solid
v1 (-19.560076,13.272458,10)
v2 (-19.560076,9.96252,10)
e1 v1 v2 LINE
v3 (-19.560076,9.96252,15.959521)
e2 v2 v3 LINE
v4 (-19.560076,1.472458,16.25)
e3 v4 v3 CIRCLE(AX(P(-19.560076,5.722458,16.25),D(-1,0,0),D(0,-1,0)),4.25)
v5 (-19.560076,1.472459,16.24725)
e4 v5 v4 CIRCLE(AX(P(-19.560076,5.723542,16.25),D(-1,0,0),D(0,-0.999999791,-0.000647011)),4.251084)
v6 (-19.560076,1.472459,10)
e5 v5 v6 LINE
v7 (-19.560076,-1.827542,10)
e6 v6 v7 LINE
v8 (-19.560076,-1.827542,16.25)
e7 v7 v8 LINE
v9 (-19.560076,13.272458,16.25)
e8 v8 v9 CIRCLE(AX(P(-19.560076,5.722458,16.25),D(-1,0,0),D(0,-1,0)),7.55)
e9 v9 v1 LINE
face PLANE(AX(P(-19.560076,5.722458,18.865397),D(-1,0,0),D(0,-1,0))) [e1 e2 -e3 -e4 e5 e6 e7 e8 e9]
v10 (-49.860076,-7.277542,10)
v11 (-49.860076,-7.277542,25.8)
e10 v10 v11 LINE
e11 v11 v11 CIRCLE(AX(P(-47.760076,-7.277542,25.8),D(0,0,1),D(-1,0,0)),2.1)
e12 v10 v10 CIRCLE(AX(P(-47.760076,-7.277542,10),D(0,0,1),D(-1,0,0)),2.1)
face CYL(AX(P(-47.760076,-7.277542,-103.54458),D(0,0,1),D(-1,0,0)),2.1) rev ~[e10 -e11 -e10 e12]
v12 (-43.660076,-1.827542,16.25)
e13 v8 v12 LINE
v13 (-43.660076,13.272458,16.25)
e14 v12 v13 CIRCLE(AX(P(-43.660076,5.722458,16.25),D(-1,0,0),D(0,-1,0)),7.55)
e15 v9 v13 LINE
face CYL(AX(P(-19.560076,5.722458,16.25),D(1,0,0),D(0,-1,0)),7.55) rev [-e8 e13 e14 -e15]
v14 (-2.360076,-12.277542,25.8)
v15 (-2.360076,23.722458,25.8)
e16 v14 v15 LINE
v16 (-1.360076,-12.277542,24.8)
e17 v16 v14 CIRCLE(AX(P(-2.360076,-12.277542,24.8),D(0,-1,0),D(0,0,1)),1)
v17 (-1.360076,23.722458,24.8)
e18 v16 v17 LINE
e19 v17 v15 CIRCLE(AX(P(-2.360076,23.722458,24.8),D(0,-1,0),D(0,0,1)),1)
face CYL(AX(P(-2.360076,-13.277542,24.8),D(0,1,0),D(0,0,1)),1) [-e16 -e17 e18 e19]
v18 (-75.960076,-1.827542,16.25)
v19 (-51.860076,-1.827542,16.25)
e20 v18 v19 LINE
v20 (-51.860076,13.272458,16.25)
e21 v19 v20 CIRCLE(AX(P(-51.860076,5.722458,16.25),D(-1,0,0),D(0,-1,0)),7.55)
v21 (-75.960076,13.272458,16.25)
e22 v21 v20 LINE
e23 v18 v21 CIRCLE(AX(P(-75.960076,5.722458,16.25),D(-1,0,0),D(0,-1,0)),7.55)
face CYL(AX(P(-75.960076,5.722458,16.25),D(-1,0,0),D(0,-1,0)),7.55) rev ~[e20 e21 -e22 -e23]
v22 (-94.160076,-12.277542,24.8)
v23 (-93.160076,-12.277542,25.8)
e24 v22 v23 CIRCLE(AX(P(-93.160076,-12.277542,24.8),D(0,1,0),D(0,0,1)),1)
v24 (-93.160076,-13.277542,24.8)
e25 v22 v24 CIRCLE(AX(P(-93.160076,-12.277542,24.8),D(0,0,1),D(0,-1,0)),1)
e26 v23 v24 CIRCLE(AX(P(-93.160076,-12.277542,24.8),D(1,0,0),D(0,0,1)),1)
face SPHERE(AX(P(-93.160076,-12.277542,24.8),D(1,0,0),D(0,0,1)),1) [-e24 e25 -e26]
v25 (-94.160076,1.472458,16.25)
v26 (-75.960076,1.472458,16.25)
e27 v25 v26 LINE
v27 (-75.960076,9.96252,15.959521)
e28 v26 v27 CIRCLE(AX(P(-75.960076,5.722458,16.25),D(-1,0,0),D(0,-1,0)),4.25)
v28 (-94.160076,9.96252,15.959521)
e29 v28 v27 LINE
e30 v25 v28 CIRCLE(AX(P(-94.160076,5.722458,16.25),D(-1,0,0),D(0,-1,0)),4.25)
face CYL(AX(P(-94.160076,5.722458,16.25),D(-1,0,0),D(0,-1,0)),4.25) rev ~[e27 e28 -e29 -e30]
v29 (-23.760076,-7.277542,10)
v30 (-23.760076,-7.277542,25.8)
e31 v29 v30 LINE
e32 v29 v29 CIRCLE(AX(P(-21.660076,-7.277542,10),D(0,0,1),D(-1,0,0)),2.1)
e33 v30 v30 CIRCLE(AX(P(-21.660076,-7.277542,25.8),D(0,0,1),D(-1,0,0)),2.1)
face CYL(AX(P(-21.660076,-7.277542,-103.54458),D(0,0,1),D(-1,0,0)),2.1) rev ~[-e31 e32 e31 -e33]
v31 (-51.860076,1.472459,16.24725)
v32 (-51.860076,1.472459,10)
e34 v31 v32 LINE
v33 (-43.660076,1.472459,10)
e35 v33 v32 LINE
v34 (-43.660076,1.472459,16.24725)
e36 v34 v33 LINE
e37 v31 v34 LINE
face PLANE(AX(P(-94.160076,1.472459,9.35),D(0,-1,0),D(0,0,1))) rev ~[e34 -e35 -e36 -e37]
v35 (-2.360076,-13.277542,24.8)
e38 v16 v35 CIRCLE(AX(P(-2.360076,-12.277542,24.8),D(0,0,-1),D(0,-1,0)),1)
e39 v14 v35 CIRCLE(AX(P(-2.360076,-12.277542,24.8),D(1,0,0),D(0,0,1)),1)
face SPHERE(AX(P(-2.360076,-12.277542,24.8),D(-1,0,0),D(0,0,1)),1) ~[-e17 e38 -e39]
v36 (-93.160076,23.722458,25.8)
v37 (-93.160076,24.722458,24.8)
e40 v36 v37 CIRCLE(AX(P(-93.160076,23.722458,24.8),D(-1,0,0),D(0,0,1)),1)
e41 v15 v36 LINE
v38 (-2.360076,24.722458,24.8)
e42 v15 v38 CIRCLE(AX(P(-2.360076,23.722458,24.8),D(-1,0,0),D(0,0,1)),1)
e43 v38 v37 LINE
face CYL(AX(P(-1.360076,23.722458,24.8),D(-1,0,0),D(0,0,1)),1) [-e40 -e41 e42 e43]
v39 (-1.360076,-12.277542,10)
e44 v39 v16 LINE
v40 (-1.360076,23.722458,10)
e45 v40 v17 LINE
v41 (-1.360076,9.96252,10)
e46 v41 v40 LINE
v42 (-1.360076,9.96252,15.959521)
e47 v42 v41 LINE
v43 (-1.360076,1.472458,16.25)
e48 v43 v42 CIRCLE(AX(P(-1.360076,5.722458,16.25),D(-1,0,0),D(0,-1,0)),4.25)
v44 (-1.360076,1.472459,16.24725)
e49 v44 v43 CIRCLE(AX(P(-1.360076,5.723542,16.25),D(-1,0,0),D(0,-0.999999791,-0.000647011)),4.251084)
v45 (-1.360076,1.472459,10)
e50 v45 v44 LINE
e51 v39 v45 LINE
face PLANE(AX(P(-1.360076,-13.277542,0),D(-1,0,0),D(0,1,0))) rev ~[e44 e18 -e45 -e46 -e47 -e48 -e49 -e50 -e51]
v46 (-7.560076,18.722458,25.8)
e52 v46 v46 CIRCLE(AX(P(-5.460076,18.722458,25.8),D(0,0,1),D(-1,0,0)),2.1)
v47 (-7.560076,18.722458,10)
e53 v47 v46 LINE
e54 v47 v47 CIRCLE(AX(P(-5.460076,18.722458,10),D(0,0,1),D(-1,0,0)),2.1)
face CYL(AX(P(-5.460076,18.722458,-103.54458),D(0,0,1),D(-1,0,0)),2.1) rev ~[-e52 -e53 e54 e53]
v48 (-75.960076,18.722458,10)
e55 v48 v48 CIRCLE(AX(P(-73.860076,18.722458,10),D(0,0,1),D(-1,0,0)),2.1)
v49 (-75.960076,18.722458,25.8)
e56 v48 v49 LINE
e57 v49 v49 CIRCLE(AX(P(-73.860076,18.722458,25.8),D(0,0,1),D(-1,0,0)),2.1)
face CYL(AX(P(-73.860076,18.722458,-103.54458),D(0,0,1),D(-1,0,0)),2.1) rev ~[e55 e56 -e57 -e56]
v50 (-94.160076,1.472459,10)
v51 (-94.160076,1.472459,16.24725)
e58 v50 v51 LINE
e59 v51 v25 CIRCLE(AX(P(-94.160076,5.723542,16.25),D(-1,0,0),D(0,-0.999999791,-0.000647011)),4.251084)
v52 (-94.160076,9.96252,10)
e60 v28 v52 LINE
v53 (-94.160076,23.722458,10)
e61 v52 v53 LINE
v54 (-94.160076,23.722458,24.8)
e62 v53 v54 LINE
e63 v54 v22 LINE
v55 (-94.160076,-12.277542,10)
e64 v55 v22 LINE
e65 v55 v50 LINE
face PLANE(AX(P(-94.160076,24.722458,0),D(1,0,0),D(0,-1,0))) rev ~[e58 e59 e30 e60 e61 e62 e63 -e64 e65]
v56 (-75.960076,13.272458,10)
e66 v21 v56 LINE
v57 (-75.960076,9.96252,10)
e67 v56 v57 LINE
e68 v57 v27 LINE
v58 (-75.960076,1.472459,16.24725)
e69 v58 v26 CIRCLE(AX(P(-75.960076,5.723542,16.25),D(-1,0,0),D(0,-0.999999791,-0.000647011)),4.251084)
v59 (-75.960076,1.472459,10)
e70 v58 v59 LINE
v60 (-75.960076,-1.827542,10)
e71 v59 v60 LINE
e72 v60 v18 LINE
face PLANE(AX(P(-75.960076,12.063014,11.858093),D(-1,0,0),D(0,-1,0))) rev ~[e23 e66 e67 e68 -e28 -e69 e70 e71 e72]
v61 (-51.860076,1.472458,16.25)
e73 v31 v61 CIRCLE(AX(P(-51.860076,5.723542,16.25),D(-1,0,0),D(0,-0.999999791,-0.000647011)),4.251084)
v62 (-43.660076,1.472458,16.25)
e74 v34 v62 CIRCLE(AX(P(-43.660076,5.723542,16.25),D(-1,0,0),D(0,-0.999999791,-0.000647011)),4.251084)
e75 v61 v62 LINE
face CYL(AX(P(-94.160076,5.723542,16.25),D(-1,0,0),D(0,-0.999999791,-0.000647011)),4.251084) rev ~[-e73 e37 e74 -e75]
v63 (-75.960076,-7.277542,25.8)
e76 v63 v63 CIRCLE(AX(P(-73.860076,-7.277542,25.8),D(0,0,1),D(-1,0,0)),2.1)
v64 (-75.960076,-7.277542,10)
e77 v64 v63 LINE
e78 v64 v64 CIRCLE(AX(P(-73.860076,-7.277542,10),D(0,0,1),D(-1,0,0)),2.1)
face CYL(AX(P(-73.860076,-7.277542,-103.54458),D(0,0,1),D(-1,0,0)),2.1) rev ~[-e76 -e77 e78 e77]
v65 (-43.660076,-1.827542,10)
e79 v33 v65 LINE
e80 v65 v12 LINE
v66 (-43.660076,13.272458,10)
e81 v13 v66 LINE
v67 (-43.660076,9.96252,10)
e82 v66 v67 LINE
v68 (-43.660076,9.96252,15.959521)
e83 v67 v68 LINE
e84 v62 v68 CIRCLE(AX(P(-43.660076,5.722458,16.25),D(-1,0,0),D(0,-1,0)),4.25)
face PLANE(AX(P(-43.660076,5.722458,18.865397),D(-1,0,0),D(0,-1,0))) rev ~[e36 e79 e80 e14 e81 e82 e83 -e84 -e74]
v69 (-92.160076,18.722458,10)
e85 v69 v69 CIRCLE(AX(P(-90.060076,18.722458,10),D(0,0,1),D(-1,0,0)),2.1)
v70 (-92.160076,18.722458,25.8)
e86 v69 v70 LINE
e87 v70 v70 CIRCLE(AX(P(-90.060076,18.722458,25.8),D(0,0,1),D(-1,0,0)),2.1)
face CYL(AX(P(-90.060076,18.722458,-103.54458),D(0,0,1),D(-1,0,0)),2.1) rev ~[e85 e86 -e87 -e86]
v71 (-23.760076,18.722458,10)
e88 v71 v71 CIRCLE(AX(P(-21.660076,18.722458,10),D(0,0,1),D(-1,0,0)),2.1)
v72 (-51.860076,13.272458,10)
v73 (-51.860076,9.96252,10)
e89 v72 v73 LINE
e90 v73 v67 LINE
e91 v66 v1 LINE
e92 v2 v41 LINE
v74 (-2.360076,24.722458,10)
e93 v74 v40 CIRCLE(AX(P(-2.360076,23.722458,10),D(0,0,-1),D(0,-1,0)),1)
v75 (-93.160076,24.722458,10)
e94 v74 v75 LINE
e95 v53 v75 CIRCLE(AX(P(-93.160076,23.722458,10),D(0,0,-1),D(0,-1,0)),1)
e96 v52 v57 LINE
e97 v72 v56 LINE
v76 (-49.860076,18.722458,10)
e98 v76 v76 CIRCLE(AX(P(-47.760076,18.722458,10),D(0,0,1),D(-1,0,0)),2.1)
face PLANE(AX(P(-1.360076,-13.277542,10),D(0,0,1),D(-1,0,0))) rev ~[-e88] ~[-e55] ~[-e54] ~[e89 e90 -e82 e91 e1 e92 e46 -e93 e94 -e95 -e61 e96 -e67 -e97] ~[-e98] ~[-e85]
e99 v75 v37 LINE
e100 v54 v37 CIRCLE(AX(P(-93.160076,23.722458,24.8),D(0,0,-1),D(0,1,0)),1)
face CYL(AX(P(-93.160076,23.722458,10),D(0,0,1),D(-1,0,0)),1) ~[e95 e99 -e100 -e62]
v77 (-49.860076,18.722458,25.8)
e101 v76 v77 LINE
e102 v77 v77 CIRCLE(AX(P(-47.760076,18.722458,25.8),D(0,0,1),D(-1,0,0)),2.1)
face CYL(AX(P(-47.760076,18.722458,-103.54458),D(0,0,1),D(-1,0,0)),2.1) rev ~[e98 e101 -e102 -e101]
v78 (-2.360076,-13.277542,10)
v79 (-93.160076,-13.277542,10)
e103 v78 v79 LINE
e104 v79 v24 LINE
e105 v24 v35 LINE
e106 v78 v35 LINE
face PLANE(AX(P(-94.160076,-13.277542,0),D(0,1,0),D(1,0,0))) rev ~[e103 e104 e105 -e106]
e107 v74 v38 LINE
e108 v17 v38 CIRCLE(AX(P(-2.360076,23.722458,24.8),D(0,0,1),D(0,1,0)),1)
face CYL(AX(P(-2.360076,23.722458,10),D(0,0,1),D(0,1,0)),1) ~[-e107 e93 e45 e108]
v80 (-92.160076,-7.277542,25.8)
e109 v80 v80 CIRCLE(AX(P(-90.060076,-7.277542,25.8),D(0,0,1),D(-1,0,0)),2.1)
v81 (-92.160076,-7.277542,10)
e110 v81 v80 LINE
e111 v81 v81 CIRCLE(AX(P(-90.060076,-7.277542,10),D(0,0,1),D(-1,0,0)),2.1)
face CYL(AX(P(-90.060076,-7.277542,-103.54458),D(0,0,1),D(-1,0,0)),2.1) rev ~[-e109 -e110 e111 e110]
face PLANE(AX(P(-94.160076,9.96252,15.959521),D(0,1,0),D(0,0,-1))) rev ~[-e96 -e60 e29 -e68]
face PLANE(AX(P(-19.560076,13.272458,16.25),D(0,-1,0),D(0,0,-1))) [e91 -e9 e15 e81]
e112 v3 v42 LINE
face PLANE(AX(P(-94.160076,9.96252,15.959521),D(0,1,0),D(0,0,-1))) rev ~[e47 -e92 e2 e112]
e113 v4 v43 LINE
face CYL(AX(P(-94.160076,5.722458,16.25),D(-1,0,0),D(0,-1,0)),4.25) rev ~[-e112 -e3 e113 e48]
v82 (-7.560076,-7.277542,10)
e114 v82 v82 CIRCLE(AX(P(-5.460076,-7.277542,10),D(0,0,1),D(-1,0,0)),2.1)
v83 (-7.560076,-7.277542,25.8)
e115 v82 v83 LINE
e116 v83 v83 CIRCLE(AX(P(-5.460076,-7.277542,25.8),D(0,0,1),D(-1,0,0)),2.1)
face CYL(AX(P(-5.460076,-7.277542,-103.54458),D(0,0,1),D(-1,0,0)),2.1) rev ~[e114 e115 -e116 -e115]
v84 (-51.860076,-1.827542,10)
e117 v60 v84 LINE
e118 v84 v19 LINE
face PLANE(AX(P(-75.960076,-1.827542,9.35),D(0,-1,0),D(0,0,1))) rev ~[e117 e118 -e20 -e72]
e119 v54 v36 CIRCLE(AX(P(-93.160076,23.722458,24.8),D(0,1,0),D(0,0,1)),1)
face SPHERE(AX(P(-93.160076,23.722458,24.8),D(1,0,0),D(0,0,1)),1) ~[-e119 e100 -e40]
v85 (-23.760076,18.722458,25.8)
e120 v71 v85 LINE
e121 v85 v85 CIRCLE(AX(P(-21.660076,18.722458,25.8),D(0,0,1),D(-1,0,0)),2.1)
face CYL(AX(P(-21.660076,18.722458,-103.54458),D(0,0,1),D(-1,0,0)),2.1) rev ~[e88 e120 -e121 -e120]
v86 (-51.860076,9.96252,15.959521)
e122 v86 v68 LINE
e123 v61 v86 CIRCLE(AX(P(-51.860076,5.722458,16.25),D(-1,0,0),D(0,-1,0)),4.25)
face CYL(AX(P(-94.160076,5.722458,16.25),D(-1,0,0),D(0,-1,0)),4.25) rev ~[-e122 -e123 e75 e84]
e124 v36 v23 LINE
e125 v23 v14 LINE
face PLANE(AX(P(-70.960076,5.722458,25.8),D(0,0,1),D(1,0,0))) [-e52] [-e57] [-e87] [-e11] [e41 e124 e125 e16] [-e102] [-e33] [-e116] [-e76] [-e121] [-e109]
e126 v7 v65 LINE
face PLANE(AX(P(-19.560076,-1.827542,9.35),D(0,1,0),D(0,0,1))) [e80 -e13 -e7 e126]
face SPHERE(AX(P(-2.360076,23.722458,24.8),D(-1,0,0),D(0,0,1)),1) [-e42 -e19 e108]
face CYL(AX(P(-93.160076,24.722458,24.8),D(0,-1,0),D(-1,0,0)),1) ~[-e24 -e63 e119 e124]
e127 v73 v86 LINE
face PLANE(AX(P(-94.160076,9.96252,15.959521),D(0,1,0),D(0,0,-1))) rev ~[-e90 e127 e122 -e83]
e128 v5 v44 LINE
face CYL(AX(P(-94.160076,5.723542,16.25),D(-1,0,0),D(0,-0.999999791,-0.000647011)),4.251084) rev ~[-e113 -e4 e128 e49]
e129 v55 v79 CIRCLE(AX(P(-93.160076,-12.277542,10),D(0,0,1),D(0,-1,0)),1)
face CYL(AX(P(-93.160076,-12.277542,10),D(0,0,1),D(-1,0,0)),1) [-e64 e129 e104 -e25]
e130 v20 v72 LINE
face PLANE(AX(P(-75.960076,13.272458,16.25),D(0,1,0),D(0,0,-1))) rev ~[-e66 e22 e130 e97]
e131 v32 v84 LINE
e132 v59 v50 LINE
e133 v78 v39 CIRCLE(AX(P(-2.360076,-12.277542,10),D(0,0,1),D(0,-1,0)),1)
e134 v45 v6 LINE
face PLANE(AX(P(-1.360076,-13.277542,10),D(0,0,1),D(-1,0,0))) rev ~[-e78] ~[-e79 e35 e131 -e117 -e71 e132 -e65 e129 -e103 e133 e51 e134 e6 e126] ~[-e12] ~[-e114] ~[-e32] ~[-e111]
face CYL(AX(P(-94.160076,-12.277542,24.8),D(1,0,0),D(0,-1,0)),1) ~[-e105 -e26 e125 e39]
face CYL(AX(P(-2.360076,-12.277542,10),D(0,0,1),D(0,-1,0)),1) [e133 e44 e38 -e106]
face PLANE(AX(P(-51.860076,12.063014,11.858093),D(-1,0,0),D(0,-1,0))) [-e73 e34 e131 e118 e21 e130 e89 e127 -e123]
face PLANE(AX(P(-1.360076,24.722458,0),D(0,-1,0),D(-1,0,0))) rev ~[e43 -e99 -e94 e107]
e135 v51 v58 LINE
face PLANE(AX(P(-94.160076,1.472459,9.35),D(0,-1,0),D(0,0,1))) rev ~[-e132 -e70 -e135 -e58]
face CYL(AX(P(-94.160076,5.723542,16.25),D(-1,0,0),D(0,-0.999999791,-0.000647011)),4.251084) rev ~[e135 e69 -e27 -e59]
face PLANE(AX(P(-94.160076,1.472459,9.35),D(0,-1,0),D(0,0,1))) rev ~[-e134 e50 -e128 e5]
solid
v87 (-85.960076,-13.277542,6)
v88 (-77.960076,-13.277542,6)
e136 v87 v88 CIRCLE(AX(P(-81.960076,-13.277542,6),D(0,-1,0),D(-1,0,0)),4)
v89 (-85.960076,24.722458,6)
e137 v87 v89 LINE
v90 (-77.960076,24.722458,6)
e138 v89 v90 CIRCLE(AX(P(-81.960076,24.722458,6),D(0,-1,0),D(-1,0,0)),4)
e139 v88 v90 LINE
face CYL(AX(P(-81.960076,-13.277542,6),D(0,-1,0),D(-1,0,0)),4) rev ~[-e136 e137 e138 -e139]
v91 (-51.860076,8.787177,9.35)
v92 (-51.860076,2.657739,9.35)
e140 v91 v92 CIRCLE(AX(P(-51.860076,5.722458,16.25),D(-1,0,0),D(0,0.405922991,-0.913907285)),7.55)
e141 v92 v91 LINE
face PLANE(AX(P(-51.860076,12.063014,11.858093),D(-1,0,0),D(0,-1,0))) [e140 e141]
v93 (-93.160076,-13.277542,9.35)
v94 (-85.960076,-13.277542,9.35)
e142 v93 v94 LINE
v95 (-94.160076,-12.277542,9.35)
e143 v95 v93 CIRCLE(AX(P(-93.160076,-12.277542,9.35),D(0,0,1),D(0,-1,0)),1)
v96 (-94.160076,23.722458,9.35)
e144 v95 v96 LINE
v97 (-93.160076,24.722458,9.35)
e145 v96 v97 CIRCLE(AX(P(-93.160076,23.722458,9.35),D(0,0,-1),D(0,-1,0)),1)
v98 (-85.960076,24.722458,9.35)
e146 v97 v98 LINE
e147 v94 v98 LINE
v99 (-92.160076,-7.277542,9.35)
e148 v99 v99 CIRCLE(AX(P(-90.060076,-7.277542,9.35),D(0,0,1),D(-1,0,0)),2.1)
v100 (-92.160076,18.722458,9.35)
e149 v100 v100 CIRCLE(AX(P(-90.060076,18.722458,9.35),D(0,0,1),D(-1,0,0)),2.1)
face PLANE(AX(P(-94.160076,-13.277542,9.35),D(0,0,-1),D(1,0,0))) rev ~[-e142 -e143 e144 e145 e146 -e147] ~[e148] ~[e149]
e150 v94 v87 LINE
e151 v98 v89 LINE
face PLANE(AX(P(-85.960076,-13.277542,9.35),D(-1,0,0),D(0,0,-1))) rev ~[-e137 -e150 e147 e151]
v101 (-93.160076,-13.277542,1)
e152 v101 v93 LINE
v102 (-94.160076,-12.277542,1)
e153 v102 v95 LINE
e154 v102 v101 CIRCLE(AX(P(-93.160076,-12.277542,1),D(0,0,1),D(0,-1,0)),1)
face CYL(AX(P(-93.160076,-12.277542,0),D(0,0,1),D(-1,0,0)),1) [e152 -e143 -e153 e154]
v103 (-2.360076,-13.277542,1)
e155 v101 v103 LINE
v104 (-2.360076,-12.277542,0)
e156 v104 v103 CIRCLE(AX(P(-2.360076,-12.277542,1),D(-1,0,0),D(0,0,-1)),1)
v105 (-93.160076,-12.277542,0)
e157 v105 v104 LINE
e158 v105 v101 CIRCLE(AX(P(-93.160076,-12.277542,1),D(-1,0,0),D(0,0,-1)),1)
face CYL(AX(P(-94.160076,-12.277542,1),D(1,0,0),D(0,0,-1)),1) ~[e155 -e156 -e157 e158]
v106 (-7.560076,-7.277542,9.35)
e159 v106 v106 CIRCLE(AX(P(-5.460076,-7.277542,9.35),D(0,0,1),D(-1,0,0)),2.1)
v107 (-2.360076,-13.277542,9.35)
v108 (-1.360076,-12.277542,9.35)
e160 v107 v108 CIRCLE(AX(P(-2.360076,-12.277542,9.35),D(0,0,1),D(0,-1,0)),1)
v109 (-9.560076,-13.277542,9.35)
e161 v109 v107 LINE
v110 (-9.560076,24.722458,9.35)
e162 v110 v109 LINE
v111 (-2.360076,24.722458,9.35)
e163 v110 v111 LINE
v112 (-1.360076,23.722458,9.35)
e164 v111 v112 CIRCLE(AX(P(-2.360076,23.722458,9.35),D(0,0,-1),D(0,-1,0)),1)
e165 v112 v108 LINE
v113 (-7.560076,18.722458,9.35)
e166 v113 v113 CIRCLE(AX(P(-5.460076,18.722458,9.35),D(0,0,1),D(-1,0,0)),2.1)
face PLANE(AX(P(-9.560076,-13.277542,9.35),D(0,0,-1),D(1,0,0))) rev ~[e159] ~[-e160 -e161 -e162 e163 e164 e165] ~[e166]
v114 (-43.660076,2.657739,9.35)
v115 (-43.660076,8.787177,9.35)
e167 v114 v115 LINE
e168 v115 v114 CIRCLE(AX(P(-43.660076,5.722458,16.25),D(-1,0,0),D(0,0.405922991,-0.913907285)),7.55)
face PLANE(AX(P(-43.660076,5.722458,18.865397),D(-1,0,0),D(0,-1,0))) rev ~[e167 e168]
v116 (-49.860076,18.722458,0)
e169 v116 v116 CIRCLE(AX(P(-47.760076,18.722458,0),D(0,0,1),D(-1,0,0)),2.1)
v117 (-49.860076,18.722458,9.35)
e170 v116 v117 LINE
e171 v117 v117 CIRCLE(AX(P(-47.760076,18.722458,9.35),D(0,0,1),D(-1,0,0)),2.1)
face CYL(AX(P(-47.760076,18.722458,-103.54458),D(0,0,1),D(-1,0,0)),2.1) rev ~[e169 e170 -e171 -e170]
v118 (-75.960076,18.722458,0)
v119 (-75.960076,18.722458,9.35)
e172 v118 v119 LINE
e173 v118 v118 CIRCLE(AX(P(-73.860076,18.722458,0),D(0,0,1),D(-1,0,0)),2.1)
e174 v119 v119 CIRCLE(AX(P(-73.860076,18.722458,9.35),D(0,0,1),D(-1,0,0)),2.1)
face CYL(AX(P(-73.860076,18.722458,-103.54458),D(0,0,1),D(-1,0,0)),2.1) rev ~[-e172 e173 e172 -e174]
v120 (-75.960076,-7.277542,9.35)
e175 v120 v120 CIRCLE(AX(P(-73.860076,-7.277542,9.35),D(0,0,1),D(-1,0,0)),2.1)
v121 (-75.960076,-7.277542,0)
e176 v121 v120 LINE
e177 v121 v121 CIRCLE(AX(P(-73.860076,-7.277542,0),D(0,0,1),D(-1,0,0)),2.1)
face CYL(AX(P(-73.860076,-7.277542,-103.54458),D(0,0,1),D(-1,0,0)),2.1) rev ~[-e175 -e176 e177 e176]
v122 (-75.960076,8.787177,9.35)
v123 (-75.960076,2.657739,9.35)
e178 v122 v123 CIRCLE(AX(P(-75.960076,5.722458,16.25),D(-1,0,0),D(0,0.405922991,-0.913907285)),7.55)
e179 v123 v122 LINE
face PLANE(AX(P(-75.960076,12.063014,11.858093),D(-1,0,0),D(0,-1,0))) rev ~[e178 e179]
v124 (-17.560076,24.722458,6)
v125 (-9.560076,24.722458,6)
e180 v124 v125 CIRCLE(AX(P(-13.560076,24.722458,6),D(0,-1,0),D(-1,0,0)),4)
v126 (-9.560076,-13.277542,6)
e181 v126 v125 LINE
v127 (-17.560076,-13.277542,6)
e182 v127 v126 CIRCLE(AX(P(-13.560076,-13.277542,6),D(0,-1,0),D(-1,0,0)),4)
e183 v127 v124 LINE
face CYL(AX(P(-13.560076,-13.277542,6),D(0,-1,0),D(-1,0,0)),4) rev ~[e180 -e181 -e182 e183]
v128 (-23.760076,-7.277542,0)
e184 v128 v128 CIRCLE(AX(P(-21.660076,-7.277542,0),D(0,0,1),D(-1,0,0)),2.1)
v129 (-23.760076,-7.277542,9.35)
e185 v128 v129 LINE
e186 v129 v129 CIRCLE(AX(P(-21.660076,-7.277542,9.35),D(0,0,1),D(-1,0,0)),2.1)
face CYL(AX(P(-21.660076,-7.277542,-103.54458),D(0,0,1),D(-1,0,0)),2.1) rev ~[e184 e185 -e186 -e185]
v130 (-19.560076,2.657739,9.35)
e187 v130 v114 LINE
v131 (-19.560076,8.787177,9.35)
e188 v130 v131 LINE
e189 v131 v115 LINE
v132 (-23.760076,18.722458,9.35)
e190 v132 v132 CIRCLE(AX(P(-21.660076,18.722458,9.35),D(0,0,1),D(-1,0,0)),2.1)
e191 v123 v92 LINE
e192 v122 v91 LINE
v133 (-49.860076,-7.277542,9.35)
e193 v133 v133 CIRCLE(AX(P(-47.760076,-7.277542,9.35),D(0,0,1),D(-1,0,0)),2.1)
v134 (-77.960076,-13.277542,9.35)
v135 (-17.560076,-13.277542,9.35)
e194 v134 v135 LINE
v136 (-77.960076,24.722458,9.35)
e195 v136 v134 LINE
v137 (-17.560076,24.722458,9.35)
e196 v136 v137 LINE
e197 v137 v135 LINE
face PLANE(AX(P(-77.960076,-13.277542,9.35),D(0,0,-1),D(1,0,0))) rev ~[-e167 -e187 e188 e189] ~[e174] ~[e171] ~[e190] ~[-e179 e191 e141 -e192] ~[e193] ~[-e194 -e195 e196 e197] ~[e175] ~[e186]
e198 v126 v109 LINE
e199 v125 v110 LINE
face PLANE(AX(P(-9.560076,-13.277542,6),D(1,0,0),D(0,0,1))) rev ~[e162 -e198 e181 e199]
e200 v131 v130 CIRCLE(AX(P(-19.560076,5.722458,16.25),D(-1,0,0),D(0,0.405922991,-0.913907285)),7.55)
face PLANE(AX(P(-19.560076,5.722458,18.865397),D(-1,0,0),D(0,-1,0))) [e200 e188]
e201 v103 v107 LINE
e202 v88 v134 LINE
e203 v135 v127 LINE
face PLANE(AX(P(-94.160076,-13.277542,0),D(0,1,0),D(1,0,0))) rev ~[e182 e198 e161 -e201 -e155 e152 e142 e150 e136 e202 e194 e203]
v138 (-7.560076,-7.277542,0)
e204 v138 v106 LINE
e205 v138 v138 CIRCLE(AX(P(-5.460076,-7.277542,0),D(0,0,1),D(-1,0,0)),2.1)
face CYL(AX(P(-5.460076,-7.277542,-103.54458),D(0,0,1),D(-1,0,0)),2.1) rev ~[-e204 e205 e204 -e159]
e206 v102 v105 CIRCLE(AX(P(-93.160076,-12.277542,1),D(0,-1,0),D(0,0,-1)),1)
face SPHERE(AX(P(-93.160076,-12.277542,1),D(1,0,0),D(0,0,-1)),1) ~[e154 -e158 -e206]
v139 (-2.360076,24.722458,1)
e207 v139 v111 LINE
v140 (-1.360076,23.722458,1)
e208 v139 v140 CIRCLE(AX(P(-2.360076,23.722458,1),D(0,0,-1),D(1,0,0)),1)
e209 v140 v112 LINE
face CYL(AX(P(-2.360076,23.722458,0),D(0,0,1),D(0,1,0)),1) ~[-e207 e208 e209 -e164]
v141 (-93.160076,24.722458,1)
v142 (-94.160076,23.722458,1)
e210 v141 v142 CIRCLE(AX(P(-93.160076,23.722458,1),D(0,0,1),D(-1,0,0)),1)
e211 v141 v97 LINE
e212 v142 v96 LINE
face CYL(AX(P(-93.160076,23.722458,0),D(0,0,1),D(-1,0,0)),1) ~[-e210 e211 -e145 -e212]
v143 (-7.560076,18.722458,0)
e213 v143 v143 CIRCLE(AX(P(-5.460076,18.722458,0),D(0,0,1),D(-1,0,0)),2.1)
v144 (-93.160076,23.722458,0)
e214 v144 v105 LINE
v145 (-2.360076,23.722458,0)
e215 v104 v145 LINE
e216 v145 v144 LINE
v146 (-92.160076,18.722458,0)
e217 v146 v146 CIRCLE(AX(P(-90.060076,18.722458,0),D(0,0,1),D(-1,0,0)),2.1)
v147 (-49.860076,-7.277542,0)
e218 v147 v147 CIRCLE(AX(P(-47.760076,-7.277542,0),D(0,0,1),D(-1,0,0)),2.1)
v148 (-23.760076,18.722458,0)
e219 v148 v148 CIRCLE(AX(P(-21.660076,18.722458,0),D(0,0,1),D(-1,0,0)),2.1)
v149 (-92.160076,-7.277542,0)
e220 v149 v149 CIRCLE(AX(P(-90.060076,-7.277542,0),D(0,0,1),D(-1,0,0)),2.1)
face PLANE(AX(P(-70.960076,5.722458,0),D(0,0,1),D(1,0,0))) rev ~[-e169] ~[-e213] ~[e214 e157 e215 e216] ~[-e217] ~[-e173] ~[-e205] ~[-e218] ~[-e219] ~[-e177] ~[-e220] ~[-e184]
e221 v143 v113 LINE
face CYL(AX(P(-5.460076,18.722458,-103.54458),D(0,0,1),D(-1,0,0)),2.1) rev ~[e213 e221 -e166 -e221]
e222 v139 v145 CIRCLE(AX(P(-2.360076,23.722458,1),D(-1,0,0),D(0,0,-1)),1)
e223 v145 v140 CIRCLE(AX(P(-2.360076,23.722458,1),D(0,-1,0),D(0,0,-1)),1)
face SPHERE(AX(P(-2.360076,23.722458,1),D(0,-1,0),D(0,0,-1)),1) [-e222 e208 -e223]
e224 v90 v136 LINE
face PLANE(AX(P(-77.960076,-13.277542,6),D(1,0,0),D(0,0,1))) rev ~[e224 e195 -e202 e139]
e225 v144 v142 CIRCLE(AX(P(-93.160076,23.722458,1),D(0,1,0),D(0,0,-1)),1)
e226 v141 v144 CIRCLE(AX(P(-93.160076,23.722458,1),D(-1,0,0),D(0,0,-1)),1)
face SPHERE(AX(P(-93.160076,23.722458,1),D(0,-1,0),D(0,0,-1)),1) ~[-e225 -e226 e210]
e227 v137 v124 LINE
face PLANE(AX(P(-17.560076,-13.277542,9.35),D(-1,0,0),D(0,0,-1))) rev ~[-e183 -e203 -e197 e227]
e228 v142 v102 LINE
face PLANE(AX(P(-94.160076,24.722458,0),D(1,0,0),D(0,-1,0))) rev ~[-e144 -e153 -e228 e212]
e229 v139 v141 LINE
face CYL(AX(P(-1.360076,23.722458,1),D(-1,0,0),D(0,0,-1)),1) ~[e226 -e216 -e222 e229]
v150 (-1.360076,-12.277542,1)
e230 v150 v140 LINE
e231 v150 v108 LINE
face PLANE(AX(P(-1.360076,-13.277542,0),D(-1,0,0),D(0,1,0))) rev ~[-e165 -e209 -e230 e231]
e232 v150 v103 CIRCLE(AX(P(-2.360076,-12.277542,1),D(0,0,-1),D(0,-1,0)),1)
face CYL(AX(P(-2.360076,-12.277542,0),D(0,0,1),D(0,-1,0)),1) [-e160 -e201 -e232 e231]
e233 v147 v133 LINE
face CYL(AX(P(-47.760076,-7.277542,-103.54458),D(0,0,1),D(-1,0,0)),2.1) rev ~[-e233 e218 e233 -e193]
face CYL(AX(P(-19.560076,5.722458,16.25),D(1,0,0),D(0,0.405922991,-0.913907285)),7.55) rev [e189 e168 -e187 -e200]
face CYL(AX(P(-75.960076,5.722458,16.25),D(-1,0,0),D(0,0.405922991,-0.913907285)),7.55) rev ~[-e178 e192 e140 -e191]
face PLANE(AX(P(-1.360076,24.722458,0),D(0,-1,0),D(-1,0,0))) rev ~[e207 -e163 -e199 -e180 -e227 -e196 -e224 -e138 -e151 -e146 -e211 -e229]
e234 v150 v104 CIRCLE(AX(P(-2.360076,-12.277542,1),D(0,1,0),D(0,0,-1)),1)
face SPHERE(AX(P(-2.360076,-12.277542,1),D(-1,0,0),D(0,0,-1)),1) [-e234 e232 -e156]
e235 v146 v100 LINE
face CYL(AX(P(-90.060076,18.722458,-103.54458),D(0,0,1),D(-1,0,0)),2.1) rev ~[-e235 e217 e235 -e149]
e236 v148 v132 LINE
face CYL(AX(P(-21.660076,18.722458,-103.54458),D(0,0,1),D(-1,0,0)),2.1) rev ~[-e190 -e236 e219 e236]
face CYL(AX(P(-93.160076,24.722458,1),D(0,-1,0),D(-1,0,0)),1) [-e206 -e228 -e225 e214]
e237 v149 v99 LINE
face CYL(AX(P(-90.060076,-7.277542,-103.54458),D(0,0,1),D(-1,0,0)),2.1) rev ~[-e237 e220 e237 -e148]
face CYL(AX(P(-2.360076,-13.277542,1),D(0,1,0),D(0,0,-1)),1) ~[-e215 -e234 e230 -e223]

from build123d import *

# Parameters (mm, degrees)
F1_DEPTH  = 25.8
F4_DEPTH  = 92.801
F3_W      = 60.4
F3_H      = 0.65
F3_W_2    = 8.2
F5_DEPTH  = 38.001
F8_DEPTH  = 24.1
F11_DEPTH = 24.1
F12_R     = 1
F13_D     = 4.2


with BuildPart() as f1:
    # F0 (on Top) → F1 (new body)
    with BuildSketch(Plane.XY):
        Polygon((-94.1600755115, 24.7224580343), (-94.1600755115, -13.2775419657), (-85.9600755115, -13.2775419657), (-77.9600755115, -13.2775419657), (-47.7600755115, -13.2775419657), (-47.7600755115, 24.7224580343), align=None)
        Polygon((-1.3600755115, 24.7224580343), (-47.7600755115, 24.7224580343), (-47.7600755115, -13.2775419657), (-17.5600755115, -13.2775419657), (-9.5600755115, -13.2775419657), (-1.3600755115, -13.2775419657), align=None)
    extrude(amount=F1_DEPTH)

    # F2 (on face) → F4 (cut, through all)
    with BuildSketch(Plane(origin=(-94.1600755115, 0, 0), x_dir=(0, -1, 0), z_dir=(-1, 0, 0))):
        with BuildLine():
            ThreePointArc((-1.4724589241, 16.247249813), (-1.4724582568, 16.2486249064), (-1.4724580343, 16.25))
            ThreePointArc((-1.4724580343, 16.25), (-5.8677825168, 20.4975146609), (-9.9625195848, 15.9595210024))
            ThreePointArc((-9.9625195848, 15.9595210024), (-5.5785078489, 12.0024385415), (-1.4724589241, 16.247249813))
        make_face()
        with BuildLine():
            ThreePointArc((-1.4724589241, 16.247249813), (-5.5785078489, 12.0024385415), (-9.9625195848, 15.9595210024))
            Line((-9.9625195848, 15.9595210024), (-9.9625195848, 10.0030505006))
            ThreePointArc((-9.9625195848, 10.0030505006), (-9.3894148029, 9.6503084877), (-8.7871766185, 9.35))
            Line((-8.7871766185, 9.35), (-2.6577394502, 9.35))
            ThreePointArc((-2.6577394502, 9.35), (-2.0502502399, 9.6532288266), (-1.4724589241, 10.0098070892))
            Line((-1.4724589241, 10.0098070892), (-1.4724589241, 16.247249813))
        make_face()
        with BuildLine():
            ThreePointArc((-8.7871766185, 9.35), (-9.3894148029, 9.6503084877), (-9.9625195848, 10.0030505006))
            Line((-9.9625195848, 10.0030505006), (-9.9625195848, 9.35))
            Line((-9.9625195848, 9.35), (-8.7871766185, 9.35))
        make_face()
        with BuildLine():
            Line((-1.4724589241, 9.35), (-1.4724589241, 10.0098070892))
            ThreePointArc((-1.4724589241, 10.0098070892), (-2.0502502399, 9.6532288266), (-2.6577394502, 9.35))
            Line((-2.6577394502, 9.35), (-1.4724589241, 9.35))
        make_face()
    extrude(amount=-F4_DEPTH, mode=Mode.SUBTRACT)

    # F3 (on face) → F5 (cut, through all)
    with BuildSketch(Plane.XZ.offset(13.2775419657)):
        with BuildLine():
            ThreePointArc((-84.145824811, 9.35), (-85.4773896287, 7.9048625675), (-85.9600755115, 6))
            Line((-85.9600755115, 6), (-77.9600755115, 6))
            ThreePointArc((-77.9600755115, 6), (-78.4427613944, 7.9048625675), (-79.7743262121, 9.35))
            Line((-79.7743262121, 9.35), (-84.145824811, 9.35))
        make_face()
        with BuildLine():
            ThreePointArc((-81.9600755115, 10), (-83.1002509366, 9.8340579025), (-84.145824811, 9.35))
            Line((-84.145824811, 9.35), (-79.7743262121, 9.35))
            ThreePointArc((-79.7743262121, 9.35), (-80.8199000864, 9.8340579025), (-81.9600755115, 10))
        make_face()
        with BuildLine():
            Line((-11.3743262121, 9.35), (-15.745824811, 9.35))
            ThreePointArc((-15.745824811, 9.35), (-17.0773896287, 7.9048625675), (-17.5600755115, 6))
            Line((-17.5600755115, 6), (-9.5600755115, 6))
            ThreePointArc((-9.5600755115, 6), (-10.0427613944, 7.9048625675), (-11.3743262121, 9.35))
        make_face()
        with BuildLine():
            ThreePointArc((-13.560075504, 10), (-14.700250933, 9.8340579036), (-15.745824811, 9.35))
            Line((-15.745824811, 9.35), (-11.3743262121, 9.35))
            ThreePointArc((-11.3743262121, 9.35), (-12.4199000828, 9.8340579015), (-13.560075504, 10))
        make_face()
        with BuildLine():
            Line((-77.9600755115, 6), (-85.9600755115, 6))
            ThreePointArc((-85.9600755115, 6), (-81.9600755115, 2), (-77.9600755115, 6))
        make_face()
        with BuildLine():
            ThreePointArc((-79.7743262121, 9.35), (-78.4427613944, 7.9048625675), (-77.9600755115, 6))
            Line((-77.9600755115, 6), (-77.9600755115, 9.35))
            Line((-77.9600755115, 9.35), (-79.7743262121, 9.35))
        make_face()
        with BuildLine():
            ThreePointArc((-81.9600755115, 10), (-80.8199000864, 9.8340579025), (-79.7743262121, 9.35))
            Line((-79.7743262121, 9.35), (-77.9600755115, 9.35))
            Line((-77.9600755115, 9.35), (-77.9600755115, 10))
            Line((-77.9600755115, 10), (-81.9600755115, 10))
        make_face()
        with BuildLine():
            Line((-85.9600755115, 9.35), (-84.145824811, 9.35))
            ThreePointArc((-84.145824811, 9.35), (-83.1002509366, 9.8340579025), (-81.9600755115, 10))
            Line((-81.9600755115, 10), (-85.9600755115, 10))
            Line((-85.9600755115, 10), (-85.9600755115, 9.35))
        make_face()
        with BuildLine():
            Line((-85.9600755115, 9.35), (-85.9600755115, 6))
            ThreePointArc((-85.9600755115, 6), (-85.4773896287, 7.9048625675), (-84.145824811, 9.35))
            Line((-84.145824811, 9.35), (-85.9600755115, 9.35))
        make_face()
        with BuildLine():
            Line((-9.5600755115, 6), (-17.5600755115, 6))
            ThreePointArc((-17.5600755115, 6), (-13.5600755115, 2), (-9.5600755115, 6))
        make_face()
        with BuildLine():
            Line((-17.5600755115, 10), (-17.5600755115, 9.35))
            Line((-17.5600755115, 9.35), (-15.745824811, 9.35))
            ThreePointArc((-15.745824811, 9.35), (-14.700250933, 9.8340579036), (-13.560075504, 10))
            Line((-13.560075504, 10), (-17.5600755115, 10))
        make_face()
        with BuildLine():
            Line((-15.745824811, 9.35), (-17.5600755115, 9.35))
            Line((-17.5600755115, 9.35), (-17.5600755115, 6))
            ThreePointArc((-17.5600755115, 6), (-17.0773896287, 7.9048625675), (-15.745824811, 9.35))
        make_face()
        with BuildLine():
            Line((-9.5600755115, 9.35), (-11.3743262121, 9.35))
            ThreePointArc((-11.3743262121, 9.35), (-10.0427613944, 7.9048625675), (-9.5600755115, 6))
            Line((-9.5600755115, 6), (-9.5600755115, 9.35))
        make_face()
        with BuildLine():
            Line((-9.5600755115, 10), (-13.560075504, 10))
            ThreePointArc((-13.560075504, 10), (-12.4199000828, 9.8340579015), (-11.3743262121, 9.35))
            Line((-11.3743262121, 9.35), (-9.5600755115, 9.35))
            Line((-9.5600755115, 9.35), (-9.5600755115, 10))
        make_face()
        with Locations((-47.7600755115, 9.675)):
            Rectangle(F3_W, F3_H)
        with Locations((-90.0600755115, 9.675)):
            Rectangle(F3_W_2, F3_H)
        with Locations((-5.4600755115, 9.675)):
            Rectangle(F3_W_2, F3_H)
    extrude(amount=-F5_DEPTH, mode=Mode.SUBTRACT)

    # F7 (on line) → F8 (cut)
    with BuildSketch(Plane(origin=(-75.9600755115, 0, 0), x_dir=(0, -1, 0), z_dir=(-1, 0, 0))):
        with BuildLine():
            ThreePointArc((-8.7871766185, 9.35), (-12.0525893643, 12.1351564617), (-13.2724580343, 16.25))
            Line((-13.2724580343, 16.25), (-13.2724580343, 9.35))
            Line((-13.2724580343, 9.35), (-8.7871766185, 9.35))
        make_face()
        with BuildLine():
            Line((1.8275419657, 9.35), (1.8275419657, 16.25))
            ThreePointArc((1.8275419657, 16.25), (0.6076732957, 12.1351564617), (-2.6577394502, 9.35))
            Line((-2.6577394502, 9.35), (1.8275419657, 9.35))
        make_face()
        with BuildLine():
            ThreePointArc((-2.6577394502, 9.35), (0.6076732957, 12.1351564617), (1.8275419657, 16.25))
            Line((1.8275419657, 16.25), (-13.2724580343, 16.25))
            ThreePointArc((-13.2724580343, 16.25), (-12.0525893643, 12.1351564617), (-8.7871766185, 9.35))
            Line((-8.7871766185, 9.35), (-2.6577394502, 9.35))
        make_face()
        with BuildLine():
            Line((-13.2724580343, 16.25), (1.8275419657, 16.25))
            ThreePointArc((1.8275419657, 16.25), (-5.7224580343, 23.8), (-13.2724580343, 16.25))
        make_face()
        with BuildLine():
            ThreePointArc((-8.7871766185, 9.35), (-5.7224580343, 8.7), (-2.6577394502, 9.35))
            Line((-2.6577394502, 9.35), (-8.7871766185, 9.35))
        make_face()
    extrude(amount=-F8_DEPTH, mode=Mode.SUBTRACT)

    # F10 (on line) → F11 (cut)
    with BuildSketch(Plane(origin=(-19.5600755115, 0, 0), x_dir=(0, -1, 0), z_dir=(-1, 0, 0))):
        with BuildLine():
            Line((-13.2724580343, 16.25), (1.8275419657, 16.25))
            ThreePointArc((1.8275419657, 16.25), (-5.7224580343, 23.8), (-13.2724580343, 16.25))
        make_face()
        with BuildLine():
            ThreePointArc((-2.6577394502, 9.35), (0.6076732957, 12.1351564617), (1.8275419657, 16.25))
            Line((1.8275419657, 16.25), (-13.2724580343, 16.25))
            ThreePointArc((-13.2724580343, 16.25), (-12.0525893643, 12.1351564617), (-8.7871766185, 9.35))
            Line((-8.7871766185, 9.35), (-2.6577394502, 9.35))
        make_face()
        with BuildLine():
            ThreePointArc((-8.7871766185, 9.35), (-12.0525893643, 12.1351564617), (-13.2724580343, 16.25))
            Line((-13.2724580343, 16.25), (-13.2724580343, 9.35))
            Line((-13.2724580343, 9.35), (-8.7871766185, 9.35))
        make_face()
        with BuildLine():
            Line((1.8275419657, 9.35), (1.8275419657, 16.25))
            ThreePointArc((1.8275419657, 16.25), (0.6076732957, 12.1351564617), (-2.6577394502, 9.35))
            Line((-2.6577394502, 9.35), (1.8275419657, 9.35))
        make_face()
        with BuildLine():
            ThreePointArc((-8.7871766185, 9.35), (-5.7224580343, 8.7), (-2.6577394502, 9.35))
            Line((-2.6577394502, 9.35), (-8.7871766185, 9.35))
        make_face()
    extrude(amount=F11_DEPTH, mode=Mode.SUBTRACT)

    # F12
    f12_edges = [f1.edges().sort_by_distance(p)[0] for p in [
        (-47.760076, -13.277542, 0),
        (-1.360076, 5.722458, 0),
        (-94.160076, 5.722458, 0),
        (-47.760076, 24.722458, 25.8),
        (-47.760076, -13.277542, 25.8),
        (-1.360076, 5.722458, 25.8),
        (-1.360076, 24.722458, 17.9),
        (-1.360076, -13.277542, 17.9),
        (-94.160076, 5.722458, 25.8),
        (-94.160076, -13.277542, 17.9),
        (-94.160076, 24.722458, 17.9),
        (-47.760076, 24.722458, 0),
        (-94.160076, 24.722458, 4.675),
        (-94.160076, -13.277542, 4.675),
        (-1.360076, 24.722458, 4.675),
        (-1.360076, -13.277542, 4.675),
    ]]
    fillet(f12_edges, radius=F12_R)

    # F13 (through all)
    with Locations(Plane(origin=(0, 0, 0), x_dir=(1, 0, 0), z_dir=(0, 0, -1))):
        with Locations((-47.7600755115, -18.7224580343), (-47.7600755115, 7.2775419657), (-90.0600755115, 7.2775419657), (-5.4600755115, 7.2775419657), (-5.4600755115, -18.7224580343), (-21.6600755115, -18.7224580343), (-73.8600755115, -18.7224580343), (-90.0600755115, -18.7224580343), (-73.8600755115, 7.2775419657), (-21.6600755115, 7.2775419657)):
            Hole(F13_D / 2)


solid = f1.part
